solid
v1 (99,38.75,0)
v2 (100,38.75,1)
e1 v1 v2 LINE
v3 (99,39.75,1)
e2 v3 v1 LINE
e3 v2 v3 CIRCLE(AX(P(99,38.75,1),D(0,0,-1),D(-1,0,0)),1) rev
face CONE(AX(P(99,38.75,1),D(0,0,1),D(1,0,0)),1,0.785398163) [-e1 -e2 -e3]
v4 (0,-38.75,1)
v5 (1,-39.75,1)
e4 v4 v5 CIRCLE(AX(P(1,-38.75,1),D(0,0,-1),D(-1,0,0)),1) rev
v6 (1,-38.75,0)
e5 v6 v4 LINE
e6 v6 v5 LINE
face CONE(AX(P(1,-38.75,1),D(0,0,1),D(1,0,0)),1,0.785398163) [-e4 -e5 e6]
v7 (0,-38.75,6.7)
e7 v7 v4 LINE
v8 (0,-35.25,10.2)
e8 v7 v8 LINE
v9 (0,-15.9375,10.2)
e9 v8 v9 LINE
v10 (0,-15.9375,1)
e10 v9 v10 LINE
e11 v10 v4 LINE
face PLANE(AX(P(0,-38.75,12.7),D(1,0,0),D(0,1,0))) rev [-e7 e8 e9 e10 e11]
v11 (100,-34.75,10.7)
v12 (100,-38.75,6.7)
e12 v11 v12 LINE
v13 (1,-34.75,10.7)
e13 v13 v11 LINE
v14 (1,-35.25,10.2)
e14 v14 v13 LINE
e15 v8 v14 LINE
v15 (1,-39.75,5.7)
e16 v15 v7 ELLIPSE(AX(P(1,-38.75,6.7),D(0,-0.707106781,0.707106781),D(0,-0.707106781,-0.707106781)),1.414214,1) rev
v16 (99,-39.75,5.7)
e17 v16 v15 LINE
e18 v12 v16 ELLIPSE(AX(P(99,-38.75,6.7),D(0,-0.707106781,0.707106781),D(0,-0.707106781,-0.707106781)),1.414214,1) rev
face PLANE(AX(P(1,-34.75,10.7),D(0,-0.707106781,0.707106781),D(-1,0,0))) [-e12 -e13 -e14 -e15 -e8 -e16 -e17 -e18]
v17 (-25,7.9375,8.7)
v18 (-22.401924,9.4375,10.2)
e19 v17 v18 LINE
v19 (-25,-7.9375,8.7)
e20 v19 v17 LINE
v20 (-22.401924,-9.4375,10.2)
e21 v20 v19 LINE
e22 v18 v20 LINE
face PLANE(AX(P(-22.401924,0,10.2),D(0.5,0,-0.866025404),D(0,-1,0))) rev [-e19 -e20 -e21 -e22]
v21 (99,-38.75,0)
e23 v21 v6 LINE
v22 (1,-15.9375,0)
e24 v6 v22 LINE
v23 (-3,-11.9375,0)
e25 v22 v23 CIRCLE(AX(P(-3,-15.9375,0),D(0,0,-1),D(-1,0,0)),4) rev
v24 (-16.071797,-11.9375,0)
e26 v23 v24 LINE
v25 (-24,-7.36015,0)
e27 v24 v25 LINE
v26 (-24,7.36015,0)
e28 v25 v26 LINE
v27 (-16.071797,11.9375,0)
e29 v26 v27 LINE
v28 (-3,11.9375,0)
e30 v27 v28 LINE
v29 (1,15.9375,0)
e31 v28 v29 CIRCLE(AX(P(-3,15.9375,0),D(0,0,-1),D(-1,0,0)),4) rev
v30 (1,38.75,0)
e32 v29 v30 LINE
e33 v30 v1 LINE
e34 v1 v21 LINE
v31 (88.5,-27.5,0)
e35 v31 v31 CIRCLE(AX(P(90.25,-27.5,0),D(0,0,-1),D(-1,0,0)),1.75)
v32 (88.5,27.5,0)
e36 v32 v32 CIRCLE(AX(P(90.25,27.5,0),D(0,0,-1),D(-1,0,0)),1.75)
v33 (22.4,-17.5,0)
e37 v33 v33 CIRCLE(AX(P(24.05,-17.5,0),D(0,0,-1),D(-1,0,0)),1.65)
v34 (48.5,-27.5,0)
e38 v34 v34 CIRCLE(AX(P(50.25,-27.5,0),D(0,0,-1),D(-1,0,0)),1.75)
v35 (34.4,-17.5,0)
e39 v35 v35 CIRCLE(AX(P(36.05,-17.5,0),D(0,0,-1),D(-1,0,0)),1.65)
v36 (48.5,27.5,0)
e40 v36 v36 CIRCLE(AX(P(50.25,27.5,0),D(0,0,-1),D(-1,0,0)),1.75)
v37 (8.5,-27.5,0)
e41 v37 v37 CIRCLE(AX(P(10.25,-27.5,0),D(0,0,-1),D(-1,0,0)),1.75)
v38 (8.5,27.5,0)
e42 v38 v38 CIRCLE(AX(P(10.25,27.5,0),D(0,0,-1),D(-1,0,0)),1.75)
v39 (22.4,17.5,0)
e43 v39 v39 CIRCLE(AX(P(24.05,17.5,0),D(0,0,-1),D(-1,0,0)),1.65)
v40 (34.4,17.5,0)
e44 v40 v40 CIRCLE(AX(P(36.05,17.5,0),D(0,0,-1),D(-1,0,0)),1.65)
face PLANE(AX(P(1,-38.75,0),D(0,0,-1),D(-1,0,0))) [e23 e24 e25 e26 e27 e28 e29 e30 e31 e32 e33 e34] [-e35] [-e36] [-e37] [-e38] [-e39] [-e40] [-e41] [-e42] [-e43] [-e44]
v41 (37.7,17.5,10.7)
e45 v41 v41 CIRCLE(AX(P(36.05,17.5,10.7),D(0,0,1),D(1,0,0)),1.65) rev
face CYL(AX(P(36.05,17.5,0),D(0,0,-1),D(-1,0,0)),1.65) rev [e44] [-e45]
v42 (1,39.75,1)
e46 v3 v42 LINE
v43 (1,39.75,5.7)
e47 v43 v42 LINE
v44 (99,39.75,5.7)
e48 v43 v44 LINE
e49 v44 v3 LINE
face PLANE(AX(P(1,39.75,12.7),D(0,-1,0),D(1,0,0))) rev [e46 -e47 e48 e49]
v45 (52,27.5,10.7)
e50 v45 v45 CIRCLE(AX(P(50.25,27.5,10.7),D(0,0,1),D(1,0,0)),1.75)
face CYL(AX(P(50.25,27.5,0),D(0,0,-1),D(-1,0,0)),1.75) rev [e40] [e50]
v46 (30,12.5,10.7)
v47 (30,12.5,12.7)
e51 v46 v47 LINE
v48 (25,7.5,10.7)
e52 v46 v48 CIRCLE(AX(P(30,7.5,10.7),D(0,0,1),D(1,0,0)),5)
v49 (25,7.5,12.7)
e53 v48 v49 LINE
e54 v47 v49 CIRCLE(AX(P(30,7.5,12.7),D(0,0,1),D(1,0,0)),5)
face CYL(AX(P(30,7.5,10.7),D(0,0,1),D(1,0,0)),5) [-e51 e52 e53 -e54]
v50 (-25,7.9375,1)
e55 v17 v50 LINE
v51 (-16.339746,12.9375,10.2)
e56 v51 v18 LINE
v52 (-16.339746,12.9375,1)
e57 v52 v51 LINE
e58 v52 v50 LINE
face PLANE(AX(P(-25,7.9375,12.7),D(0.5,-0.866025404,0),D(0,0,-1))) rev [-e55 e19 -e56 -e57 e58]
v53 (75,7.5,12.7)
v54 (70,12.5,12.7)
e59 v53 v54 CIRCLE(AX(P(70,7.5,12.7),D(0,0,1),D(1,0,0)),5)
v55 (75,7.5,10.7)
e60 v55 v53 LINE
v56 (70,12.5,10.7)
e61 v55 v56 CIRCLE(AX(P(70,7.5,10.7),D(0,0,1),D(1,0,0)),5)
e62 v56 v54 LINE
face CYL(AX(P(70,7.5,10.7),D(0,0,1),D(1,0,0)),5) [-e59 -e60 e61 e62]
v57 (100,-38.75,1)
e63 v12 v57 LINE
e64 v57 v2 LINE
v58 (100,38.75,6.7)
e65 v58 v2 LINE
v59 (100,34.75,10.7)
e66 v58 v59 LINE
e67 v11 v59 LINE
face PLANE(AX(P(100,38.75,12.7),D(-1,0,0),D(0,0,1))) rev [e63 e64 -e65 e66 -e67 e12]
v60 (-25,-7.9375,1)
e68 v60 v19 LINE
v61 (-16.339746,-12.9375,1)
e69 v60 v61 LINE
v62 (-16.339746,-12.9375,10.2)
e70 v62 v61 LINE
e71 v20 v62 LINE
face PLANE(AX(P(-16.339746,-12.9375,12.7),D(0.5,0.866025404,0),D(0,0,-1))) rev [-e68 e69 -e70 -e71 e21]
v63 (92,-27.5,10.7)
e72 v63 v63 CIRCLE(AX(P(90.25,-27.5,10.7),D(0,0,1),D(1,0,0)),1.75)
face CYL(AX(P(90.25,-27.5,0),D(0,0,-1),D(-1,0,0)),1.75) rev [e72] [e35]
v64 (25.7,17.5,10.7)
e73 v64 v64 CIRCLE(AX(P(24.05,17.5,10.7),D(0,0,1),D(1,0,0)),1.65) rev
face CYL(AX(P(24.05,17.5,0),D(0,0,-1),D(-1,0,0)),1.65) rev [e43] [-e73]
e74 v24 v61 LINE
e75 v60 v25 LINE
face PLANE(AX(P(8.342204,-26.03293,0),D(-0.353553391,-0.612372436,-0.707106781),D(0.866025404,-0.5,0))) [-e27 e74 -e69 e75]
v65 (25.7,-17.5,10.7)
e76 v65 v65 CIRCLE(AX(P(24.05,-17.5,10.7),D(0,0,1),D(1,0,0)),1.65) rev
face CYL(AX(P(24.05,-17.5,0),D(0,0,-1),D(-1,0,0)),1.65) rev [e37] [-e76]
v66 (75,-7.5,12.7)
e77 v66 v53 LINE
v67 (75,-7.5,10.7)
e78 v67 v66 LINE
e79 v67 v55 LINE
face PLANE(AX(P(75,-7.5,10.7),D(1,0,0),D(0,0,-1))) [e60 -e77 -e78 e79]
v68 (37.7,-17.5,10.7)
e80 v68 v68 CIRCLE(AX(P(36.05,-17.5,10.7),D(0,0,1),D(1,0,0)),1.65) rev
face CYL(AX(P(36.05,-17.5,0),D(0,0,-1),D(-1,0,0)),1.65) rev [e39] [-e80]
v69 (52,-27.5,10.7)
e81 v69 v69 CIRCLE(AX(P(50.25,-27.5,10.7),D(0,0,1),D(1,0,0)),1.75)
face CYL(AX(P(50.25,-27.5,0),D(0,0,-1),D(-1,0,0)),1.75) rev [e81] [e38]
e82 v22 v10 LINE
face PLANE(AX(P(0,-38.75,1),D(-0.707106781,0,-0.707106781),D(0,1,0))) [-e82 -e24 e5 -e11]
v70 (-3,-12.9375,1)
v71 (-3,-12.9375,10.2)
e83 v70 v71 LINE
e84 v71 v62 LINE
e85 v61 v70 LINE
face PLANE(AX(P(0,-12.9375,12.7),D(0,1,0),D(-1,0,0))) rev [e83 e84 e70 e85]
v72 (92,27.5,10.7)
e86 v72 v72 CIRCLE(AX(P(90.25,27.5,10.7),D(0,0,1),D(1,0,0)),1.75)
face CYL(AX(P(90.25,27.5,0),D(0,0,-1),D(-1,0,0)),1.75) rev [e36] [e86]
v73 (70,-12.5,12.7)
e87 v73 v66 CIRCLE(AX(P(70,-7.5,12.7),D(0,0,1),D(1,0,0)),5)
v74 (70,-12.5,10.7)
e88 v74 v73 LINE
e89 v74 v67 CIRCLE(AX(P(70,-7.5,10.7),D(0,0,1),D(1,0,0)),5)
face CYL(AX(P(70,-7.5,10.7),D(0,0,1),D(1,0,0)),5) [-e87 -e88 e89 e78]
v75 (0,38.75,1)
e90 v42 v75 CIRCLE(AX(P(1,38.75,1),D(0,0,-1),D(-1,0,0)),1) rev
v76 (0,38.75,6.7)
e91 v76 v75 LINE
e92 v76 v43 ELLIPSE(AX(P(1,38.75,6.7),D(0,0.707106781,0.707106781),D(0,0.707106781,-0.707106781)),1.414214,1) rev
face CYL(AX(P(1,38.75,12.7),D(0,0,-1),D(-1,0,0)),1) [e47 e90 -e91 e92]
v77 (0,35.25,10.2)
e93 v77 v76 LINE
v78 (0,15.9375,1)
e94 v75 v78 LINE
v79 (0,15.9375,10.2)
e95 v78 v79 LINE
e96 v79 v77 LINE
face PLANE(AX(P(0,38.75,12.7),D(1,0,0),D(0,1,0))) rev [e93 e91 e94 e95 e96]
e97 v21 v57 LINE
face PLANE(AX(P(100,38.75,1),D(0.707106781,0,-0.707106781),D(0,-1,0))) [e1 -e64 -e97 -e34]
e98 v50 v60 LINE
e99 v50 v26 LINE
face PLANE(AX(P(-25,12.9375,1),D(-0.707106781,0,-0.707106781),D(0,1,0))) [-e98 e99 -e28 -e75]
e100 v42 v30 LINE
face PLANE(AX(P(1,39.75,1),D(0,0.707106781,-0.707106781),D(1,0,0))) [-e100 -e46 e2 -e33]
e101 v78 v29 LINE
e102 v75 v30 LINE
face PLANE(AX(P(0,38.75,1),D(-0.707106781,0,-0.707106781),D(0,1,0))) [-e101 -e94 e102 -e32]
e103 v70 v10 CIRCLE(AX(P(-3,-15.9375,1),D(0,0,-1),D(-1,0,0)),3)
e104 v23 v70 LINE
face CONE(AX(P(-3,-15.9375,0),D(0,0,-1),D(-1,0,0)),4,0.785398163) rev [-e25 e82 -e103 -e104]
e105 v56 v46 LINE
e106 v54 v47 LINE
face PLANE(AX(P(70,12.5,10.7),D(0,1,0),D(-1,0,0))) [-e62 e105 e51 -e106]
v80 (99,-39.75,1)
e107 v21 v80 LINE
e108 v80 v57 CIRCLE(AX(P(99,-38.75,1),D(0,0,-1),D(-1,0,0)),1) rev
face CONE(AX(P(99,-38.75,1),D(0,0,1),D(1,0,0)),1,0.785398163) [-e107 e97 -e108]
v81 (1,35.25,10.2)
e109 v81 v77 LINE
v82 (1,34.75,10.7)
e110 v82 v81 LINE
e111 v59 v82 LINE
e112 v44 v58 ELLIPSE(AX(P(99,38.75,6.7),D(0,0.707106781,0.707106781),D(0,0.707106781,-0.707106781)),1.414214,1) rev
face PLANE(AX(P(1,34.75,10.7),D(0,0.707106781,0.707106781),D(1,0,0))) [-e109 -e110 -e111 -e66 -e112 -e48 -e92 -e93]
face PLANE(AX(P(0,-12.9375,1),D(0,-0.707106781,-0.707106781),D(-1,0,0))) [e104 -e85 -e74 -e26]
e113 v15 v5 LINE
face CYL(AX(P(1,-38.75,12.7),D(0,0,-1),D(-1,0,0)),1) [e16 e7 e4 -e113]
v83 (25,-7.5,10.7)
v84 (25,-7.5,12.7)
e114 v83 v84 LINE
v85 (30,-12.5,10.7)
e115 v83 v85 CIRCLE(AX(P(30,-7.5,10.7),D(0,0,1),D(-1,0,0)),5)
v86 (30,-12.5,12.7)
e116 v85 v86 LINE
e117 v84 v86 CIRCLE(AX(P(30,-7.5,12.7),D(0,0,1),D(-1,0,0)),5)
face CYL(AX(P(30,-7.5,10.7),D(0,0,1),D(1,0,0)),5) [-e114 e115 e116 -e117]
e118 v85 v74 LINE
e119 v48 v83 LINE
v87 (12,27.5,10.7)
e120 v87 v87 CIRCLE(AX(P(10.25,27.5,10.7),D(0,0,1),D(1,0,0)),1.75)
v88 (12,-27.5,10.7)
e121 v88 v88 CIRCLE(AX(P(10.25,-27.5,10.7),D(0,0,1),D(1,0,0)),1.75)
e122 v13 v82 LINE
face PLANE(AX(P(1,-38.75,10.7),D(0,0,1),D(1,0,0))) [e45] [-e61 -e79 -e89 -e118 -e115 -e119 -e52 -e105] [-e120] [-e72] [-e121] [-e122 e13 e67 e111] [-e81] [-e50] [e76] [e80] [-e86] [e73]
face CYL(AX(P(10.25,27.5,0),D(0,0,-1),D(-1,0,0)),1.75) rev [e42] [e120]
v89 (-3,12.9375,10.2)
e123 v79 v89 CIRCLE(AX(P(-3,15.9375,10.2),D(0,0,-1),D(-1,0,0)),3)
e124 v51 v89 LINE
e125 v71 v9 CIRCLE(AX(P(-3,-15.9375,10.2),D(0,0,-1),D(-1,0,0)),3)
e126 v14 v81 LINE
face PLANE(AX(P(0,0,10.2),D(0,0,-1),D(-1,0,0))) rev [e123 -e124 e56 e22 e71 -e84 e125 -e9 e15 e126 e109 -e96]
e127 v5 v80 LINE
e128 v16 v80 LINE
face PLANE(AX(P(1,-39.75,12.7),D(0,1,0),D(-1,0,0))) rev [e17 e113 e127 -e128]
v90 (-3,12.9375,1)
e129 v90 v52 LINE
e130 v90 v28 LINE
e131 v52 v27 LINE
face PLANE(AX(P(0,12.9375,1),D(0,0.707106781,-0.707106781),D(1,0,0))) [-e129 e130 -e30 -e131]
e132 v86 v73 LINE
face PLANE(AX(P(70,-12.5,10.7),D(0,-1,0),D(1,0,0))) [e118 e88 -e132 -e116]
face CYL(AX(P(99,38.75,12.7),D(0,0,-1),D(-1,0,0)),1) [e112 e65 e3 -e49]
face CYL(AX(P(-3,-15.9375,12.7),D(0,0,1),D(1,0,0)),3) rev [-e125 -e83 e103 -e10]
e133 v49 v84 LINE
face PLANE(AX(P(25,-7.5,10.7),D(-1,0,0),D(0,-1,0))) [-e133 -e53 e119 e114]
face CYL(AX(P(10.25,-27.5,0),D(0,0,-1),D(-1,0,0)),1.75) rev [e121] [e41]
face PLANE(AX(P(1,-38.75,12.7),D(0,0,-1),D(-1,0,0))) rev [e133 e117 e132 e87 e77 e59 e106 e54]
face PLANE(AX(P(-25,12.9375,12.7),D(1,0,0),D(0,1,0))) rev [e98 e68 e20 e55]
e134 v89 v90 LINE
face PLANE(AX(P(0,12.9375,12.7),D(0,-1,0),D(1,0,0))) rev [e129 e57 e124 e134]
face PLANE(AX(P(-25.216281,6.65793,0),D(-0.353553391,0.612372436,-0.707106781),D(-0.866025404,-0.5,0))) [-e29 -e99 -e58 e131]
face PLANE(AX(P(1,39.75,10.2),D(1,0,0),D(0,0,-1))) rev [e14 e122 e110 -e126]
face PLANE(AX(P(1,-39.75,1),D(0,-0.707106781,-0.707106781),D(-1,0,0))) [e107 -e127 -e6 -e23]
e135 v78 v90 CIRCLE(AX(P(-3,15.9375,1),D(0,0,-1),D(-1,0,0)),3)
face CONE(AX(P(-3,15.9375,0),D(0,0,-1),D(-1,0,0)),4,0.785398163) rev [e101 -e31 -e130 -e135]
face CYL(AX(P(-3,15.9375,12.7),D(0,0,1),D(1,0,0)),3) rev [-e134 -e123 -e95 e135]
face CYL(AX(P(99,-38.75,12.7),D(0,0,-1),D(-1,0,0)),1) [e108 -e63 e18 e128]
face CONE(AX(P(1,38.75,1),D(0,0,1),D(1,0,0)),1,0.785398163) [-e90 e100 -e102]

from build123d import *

# Parameters (mm, degrees)
BOSS_EXTRUDE1_DEPTH         = 12.7
CHAMFER1_SIZE               = 5
CHAMFER1_SIZE2              = 8.660254038
TAP_DRILL_FOR_M4X0_7_TAP1_D = 3.3
CUT_EXTRUDE2_START          = -2
CUT_EXTRUDE2_DEPTH          = 2
SKETCH6_W                   = 26
SKETCH6_H                   = 79.5
CUT_EXTRUDE1_DEPTH          = 0.5
FILLET1_R                   = 3
CHAMFER2_SIZE               = 1
CHAMFER3_SIZE               = 1.5
CHAMFER3_SIZE2              = 2.598076211
TAP_DRILL_FOR_M5X0_8_TAP1_D = 3.5
CHAMFER4_SIZE               = 5


# Some blends are built 0.0001 mm under size
with BuildPart() as part:
    # Sketch1 → Boss-Extrude1 (new body)
    with BuildSketch(Plane.XY):
        with BuildLine():
            Line((0, 38.75), (0, 12.9375))
            Line((0, 12.9375), (-25, 12.9375))
            Line((-25, 12.9375), (-25, -12.9375))
            Line((-25, -12.9375), (0, -12.9375))
            Line((0, -12.9375), (0, -38.75))
            ThreePointArc((0, -38.75), (0.292893219, -39.457106781), (1, -39.75))
            Line((1, -39.75), (99, -39.75))
            ThreePointArc((99, -39.75), (99.707106781, -39.457106781), (100, -38.75))
            Line((100, -38.75), (100, 38.75))
            ThreePointArc((100, 38.75), (99.707106781, 39.457106781), (99, 39.75))
            Line((99, 39.75), (1, 39.75))
            ThreePointArc((1, 39.75), (0.292893219, 39.457106781), (0, 38.75))
        make_face()
    extrude(amount=BOSS_EXTRUDE1_DEPTH)

    # Chamfer1
    chamfer1_edges = [part.edges().sort_by_distance(p)[0] for p in [
        (-25, -12.9375, 6.35),
        (-25, 12.9375, 6.35),
    ]]
    chamfer1_side = [part.faces().sort_by_distance(p)[0] for p in [
        (-25, 0, 6.35),
    ]]
    chamfer(chamfer1_edges, length=CHAMFER1_SIZE, length2=CHAMFER1_SIZE2, reference=chamfer1_side[0])

    # Tap Drill for M4x0.7 Tap1 (through all)
    with Locations(Plane(origin=(0, 0, 0), x_dir=(-1, 0, 0), z_dir=(0, 0, -1))):
        with Locations((-24.05, 17.5), (-24.05, -17.5), (-36.05, 17.5), (-36.05, -17.5)):
            Hole(TAP_DRILL_FOR_M4X0_7_TAP1_D / 2)

    # Sketch9 → Cut-Extrude2 (cut)
    with BuildSketch(Plane.XY.offset(12.7).offset(CUT_EXTRUDE2_START)):
        with BuildLine():
            Line((0, 12.9375), (-16.339745962, 12.9375))
            Line((-16.339745962, 12.9375), (-25, 7.9375))
            Line((-25, 7.9375), (-25, -7.9375))
            Line((-25, -7.9375), (-16.339745962, -12.9375))
            Line((-16.339745962, -12.9375), (0, -12.9375))
            Line((0, -12.9375), (0, -38.75))
            ThreePointArc((0, -38.75), (0.292893219, -39.457106781), (1, -39.75))
            Line((1, -39.75), (99, -39.75))
            ThreePointArc((99, -39.75), (99.707106781, -39.457106781), (100, -38.75))
            Line((100, -38.75), (100, 38.75))
            ThreePointArc((100, 38.75), (99.707106781, 39.457106781), (99, 39.75))
            Line((99, 39.75), (1, 39.75))
            ThreePointArc((1, 39.75), (0.292893219, 39.457106781), (0, 38.75))
            Line((0, 38.75), (0, 12.9375))
        make_face()
        with BuildLine():
            Line((70, -12.5), (30, -12.5))
            ThreePointArc((30, -12.5), (26.464466094, -11.035533906), (25, -7.5))
            Line((25, -7.5), (25, 7.5))
            ThreePointArc((25, 7.5), (26.464466094, 11.035533906), (30, 12.5))
            Line((30, 12.5), (70, 12.5))
            ThreePointArc((70, 12.5), (73.535533906, 11.035533906), (75, 7.5))
            Line((75, 7.5), (75, -7.5))
            ThreePointArc((75, -7.5), (73.535533906, -11.035533906), (70, -12.5))
        make_face(mode=Mode.SUBTRACT)
    extrude(amount=CUT_EXTRUDE2_DEPTH, mode=Mode.SUBTRACT)

    # Sketch6 → Cut-Extrude1 (cut)
    with BuildSketch(Plane.XY.offset(10.7)):
        with Locations((-12, 0)):
            Rectangle(SKETCH6_W, SKETCH6_H)
    extrude(amount=-CUT_EXTRUDE1_DEPTH, mode=Mode.SUBTRACT)

    # Fillet1
    fillet1_edges = [part.edges().sort_by_distance(p)[0] for p in [
        (0, 12.9375, 5.1),
        (0, -12.9375, 5.1),
    ]]
    fillet(fillet1_edges, radius=FILLET1_R)

    # Chamfer2
    chamfer2_edges = [part.edges().sort_by_distance(p)[0] for p in [
        (0, 27.34375, 0),
        (0.292893219, 39.457106781, 0),
        (50, 39.75, 0),
        (99.707106781, 39.457106781, 0),
        (100, 0, 0),
        (99.707106781, -39.457106781, 0),
        (50, -39.75, 0),
        (0.292893219, -39.457106781, 0),
        (0, -27.34375, 0),
        (-9.669872981, 12.9375, 0),
        (-0.878679656, -13.816179656, 0),
        (-0.878679656, 13.816179656, 0),
        (-25, 0, 0),
        (-9.669872981, -12.9375, 0),
        (-20.669872981, -10.4375, 0),
        (-20.669872981, 10.4375, 0),
    ]]
    chamfer(chamfer2_edges, length=CHAMFER2_SIZE - 0.0001)  # a hair under: the kernel refuses the full size

    # Chamfer3
    chamfer3_edges = [part.edges().sort_by_distance(p)[0] for p in [
        (-25, 0, 10.2),
    ]]
    chamfer3_side = [part.faces().sort_by_distance(p)[0] for p in [
        (-25, 0, 5.59995),
    ]]
    chamfer(chamfer3_edges, length=CHAMFER3_SIZE, length2=CHAMFER3_SIZE2, reference=chamfer3_side[0])

    # Tap Drill for M5x0.8 Tap1 (through all)
    with Locations(Plane(origin=(0, 0, 0), x_dir=(-1, 0, 0), z_dir=(0, 0, -1))):
        with Locations((-90.25, 27.5), (-50.25, 27.5), (-10.25, 27.5), (-10.25, -27.5), (-50.25, -27.5), (-90.25, -27.5)):
            Hole(TAP_DRILL_FOR_M5X0_8_TAP1_D / 2)

    # Chamfer4
    # the kernel refuses this chamfer: 5 mm, written as the material it takes off along each edge
    with BuildSketch(Plane(origin=(-11.85841494, -39.75, 10.7), x_dir=(0, -0.027495876610586317, -0.9996219169112968), z_dir=(1, 0, 0)), Plane(origin=(111.85841494, 39.75, 10.7), x_dir=(0, 0.027495876610586317, -0.9996219169112968), z_dir=(-1, 0, 0))) as chamfer4_piece_1:
        Polygon((CHAMFER4_SIZE * 0.999621916911, CHAMFER4_SIZE * 0.0274958766106), (-CHAMFER4_SIZE * 0.0274958766106, CHAMFER4_SIZE * 0.999621916911), (0, 0), align=None)
    extrude(amount=123.71682988, mode=Mode.SUBTRACT)


solid = part.part
